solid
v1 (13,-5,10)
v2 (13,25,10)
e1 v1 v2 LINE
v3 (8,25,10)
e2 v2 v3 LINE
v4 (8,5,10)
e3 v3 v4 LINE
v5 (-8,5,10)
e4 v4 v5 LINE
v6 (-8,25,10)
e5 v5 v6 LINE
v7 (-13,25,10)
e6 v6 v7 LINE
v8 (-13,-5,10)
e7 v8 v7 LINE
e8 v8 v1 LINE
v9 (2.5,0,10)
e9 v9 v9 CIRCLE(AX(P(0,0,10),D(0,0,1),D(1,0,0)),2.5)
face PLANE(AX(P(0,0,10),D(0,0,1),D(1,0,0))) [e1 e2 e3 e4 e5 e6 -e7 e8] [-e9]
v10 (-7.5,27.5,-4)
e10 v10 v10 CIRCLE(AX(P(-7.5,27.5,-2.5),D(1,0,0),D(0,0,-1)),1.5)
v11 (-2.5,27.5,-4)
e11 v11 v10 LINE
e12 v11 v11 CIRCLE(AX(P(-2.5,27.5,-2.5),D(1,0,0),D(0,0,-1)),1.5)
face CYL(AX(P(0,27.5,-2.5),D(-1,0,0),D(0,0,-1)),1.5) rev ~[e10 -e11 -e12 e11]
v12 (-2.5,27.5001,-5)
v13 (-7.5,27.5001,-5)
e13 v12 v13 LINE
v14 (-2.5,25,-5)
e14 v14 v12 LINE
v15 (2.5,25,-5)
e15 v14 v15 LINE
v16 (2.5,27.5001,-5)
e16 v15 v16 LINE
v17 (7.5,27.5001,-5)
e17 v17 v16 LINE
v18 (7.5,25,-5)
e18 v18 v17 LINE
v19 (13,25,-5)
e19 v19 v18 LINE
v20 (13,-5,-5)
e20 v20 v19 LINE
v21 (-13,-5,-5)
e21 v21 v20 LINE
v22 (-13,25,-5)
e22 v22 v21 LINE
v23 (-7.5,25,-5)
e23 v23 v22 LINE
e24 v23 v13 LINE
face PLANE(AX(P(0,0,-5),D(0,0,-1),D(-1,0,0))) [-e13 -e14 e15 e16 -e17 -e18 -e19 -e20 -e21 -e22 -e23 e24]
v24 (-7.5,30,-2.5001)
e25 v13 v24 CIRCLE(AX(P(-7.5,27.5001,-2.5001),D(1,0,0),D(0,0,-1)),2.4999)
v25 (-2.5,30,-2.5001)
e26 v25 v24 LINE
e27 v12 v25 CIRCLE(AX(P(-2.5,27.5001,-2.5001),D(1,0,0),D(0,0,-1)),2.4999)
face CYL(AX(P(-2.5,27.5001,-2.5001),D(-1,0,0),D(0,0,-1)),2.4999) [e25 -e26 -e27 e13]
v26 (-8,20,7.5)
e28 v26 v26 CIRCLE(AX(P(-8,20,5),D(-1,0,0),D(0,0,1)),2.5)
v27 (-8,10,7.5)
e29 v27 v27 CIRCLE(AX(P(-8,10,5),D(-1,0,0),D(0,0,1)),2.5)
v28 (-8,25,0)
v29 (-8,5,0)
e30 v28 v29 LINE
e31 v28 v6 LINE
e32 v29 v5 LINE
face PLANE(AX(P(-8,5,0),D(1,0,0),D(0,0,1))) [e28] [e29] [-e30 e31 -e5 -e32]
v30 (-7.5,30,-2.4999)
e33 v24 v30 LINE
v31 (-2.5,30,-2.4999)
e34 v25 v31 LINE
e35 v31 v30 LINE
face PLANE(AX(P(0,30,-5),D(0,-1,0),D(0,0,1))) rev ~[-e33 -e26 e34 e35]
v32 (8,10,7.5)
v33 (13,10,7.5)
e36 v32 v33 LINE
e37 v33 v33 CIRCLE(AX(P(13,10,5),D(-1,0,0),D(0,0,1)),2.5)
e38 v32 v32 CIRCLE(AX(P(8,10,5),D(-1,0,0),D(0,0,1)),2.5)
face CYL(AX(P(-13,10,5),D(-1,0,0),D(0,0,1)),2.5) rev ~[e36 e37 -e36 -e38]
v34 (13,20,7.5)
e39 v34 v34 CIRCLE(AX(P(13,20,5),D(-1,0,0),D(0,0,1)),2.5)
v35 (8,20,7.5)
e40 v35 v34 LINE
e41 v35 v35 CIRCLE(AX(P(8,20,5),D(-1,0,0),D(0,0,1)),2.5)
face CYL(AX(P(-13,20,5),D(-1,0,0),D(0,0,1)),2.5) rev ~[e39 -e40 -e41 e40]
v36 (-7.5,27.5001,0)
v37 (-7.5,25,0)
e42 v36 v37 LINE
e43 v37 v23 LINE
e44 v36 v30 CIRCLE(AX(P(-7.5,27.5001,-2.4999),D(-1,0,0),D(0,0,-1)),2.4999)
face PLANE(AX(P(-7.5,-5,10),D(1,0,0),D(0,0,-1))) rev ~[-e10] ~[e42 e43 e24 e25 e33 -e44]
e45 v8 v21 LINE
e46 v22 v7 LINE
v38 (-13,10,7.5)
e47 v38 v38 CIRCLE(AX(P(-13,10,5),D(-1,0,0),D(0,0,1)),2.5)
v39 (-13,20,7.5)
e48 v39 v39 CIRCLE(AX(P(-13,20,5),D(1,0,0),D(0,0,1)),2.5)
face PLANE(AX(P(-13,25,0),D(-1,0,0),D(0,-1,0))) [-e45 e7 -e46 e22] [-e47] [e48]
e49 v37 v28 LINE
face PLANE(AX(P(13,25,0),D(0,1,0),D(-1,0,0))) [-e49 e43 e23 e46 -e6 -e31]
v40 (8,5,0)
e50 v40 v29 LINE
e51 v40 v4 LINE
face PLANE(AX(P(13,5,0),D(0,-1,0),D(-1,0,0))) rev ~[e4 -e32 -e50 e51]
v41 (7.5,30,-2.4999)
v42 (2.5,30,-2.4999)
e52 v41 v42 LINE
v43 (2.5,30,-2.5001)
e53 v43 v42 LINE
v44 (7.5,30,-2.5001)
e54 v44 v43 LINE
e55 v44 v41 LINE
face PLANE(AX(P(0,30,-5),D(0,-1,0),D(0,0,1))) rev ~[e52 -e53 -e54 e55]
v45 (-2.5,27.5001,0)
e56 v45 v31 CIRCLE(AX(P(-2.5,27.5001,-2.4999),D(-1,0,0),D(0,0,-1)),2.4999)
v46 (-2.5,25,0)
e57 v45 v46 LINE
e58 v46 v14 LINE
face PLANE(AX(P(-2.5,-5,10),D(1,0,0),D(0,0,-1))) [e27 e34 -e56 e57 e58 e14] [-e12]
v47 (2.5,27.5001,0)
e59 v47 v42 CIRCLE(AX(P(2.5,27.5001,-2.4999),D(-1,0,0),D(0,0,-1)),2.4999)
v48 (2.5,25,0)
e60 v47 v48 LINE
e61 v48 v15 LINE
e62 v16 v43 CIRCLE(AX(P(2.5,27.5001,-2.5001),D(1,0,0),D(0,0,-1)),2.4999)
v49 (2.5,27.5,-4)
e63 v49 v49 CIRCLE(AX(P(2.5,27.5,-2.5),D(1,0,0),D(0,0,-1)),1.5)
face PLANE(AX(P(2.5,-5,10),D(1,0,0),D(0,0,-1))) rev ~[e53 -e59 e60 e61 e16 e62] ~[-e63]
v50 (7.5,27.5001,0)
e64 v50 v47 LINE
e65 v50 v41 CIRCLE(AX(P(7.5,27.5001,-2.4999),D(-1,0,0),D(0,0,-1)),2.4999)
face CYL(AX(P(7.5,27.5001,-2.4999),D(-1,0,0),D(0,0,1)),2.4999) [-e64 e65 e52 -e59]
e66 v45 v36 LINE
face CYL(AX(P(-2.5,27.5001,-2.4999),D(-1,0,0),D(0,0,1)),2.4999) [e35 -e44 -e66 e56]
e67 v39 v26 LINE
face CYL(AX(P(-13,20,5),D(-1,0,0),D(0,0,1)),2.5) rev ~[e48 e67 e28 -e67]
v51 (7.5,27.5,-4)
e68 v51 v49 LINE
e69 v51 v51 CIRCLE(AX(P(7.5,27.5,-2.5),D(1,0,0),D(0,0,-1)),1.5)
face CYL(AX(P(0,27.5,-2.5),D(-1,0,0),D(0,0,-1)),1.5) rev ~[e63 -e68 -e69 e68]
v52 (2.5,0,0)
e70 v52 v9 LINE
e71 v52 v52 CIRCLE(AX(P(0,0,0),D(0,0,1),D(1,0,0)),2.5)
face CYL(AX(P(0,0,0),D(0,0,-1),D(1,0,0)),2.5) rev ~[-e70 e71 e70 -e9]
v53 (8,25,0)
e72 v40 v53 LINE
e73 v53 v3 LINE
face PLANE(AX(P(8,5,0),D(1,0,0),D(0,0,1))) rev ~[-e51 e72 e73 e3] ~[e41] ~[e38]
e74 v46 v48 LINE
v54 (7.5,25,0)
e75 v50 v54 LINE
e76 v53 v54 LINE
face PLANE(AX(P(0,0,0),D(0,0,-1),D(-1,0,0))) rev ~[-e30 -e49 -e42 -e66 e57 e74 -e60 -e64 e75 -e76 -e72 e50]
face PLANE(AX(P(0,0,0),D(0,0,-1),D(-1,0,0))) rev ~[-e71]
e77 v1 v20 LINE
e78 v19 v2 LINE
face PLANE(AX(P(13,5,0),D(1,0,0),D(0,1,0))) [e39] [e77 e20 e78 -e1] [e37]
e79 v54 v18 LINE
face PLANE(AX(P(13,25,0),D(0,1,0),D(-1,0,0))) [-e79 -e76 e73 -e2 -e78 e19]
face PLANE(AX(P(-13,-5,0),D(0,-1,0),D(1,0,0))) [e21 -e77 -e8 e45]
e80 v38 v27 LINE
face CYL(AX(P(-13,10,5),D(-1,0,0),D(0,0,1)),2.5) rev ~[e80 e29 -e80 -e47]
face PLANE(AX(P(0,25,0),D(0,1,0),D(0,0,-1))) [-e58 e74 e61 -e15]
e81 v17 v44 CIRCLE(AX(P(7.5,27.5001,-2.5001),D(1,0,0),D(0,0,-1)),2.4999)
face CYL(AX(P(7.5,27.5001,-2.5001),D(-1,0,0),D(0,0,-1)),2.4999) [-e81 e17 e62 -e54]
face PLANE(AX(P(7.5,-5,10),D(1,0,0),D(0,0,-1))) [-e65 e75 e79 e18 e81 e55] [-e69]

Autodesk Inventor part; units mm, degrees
ref_plane "YZ Plane" through (0, 0, 0) normal (1, 0, 0) x (0, 1, 0)
sketch "스케치1" plane through (0, 0, 0) normal (0, 0, 1) x (1, 0, 0)
  line L0 (-13, -5) -> (13, -5)
  line L1 (13, -5) -> (13, 5)
  line L2 (13, 5) -> (-13, 5)
  line L3 (-13, 5) -> (-13, -5)
  line L4 (-13, -5) -> (13, 5) construction
  line L5 (13, -5) -> (-13, 5) construction
  circle A0 centre (0, 0) radius 2.5
  dimension "d0" = 26
  dimension "d1" = 10
  dimension "d2" = 5
extrude "돌출1" add sketch "스케치1" along normal blind 10
sketch "스케치2" plane through (-13, 5, 0) normal (0, 1, 0) x (1, 0, 0)
  line L0 (26, 0) -> (0, 0) projected
  line L1 (26, -10) -> (0, -10) projected
  line L2 (0, 0) -> (5, 0)
  line L3 (5, 0) -> (5, -10)
  line L4 (5, -10) -> (0, -10)
  line L5 (0, -10) -> (0, 0)
  line L6 (13, 0) -> (13, -10)
  line L7 (26, 0) -> (21, 0)
  line L8 (21, 0) -> (21, -10)
  line L9 (21, -10) -> (26, -10)
  line L10 (26, -10) -> (26, 0)
  point P0 (0, -10)
  point P1 (21, 0)
  dimension "d5" = 5
  dimension "d6" = 8
extrude "돌출2" add sketch "스케치2" along normal blind 10 contours L10 L1 L8 L0 | L3 L1 L5 L0
sketch "스케치3" plane through (-13, 5, 0) normal (-1, 0, 0) x (0, 0, 1)
  circle A0 centre (5, 5) radius 2.5
  line L0 (0, 10) -> (10, 10) projected
  line L1 (10, -10) -> (10, 10) projected
  point P0 (0, -5)
  point P1 (10, 0)
  point P2 (10, 5)
  point P3 (5, 10)
  point P4 (5, 10)
  dimension "d9" = 5
extrude "돌출3" cut sketch "스케치3" against normal through all
ref_plane "작업 평면1" through (-13, 15, 0) normal (0, 1, 0) x (1, 0, 0)
mirror "미러1" about plane through (-10.5, 15, 5) normal (0, 1, 0) of "돌출3", "돌출2"
sketch "스케치4" plane through (0, 0, 0) normal (0, 0, -1) x (-1, 0, 0)
  line L0 (-13, 5) -> (-13, 25) projected
  line L1 (13, -5) -> (-13, -5) projected
  line L2 (-13, 25) -> (13, 25)
  line L3 (13, 25) -> (13, -5)
  line L4 (13, -5) -> (-13, -5)
  line L5 (-13, -5) -> (-13, 25)
  point P0 (0, 0)
  point P1 (13, 25)
extrude "돌출4" add sketch "스케치4" along normal blind 5
ref_plane "작업 평면2" through (0, -5, 10) normal (1, 0, 0) x (0, 0, -1)
sketch "스케치5" plane through (0, -5, 10) normal (1, 0, 0) x (0, 0, -1)
  line L0 (10, 10) -> (10, 30) projected
  line L1 (10, 30) -> (15, 30)
  line L2 (15, 30) -> (15, 35)
  line L3 (15, 35) -> (10, 35)
  line L4 (10, 35) -> (10, 30)
  circle A0 centre (12.5, 32.5) radius 1.5
  point P0 (10, 5)
  point P1 (10, 32.5)
  point P2 (12.5, 35)
  dimension "d16" = 5
  dimension "d19" = 3
extrude "돌출5" add sketch "스케치5" along normal mid plane 15
extrude "돌출6" cut sketch "스케치5" along normal mid plane 5
fillet "모깎기2" radius 2.5 4 edges at (-5, 30, -5) (-5, 30, 0) (5, 30, -5) (5, 30, 0)
properties part number "SteeringFrame"
